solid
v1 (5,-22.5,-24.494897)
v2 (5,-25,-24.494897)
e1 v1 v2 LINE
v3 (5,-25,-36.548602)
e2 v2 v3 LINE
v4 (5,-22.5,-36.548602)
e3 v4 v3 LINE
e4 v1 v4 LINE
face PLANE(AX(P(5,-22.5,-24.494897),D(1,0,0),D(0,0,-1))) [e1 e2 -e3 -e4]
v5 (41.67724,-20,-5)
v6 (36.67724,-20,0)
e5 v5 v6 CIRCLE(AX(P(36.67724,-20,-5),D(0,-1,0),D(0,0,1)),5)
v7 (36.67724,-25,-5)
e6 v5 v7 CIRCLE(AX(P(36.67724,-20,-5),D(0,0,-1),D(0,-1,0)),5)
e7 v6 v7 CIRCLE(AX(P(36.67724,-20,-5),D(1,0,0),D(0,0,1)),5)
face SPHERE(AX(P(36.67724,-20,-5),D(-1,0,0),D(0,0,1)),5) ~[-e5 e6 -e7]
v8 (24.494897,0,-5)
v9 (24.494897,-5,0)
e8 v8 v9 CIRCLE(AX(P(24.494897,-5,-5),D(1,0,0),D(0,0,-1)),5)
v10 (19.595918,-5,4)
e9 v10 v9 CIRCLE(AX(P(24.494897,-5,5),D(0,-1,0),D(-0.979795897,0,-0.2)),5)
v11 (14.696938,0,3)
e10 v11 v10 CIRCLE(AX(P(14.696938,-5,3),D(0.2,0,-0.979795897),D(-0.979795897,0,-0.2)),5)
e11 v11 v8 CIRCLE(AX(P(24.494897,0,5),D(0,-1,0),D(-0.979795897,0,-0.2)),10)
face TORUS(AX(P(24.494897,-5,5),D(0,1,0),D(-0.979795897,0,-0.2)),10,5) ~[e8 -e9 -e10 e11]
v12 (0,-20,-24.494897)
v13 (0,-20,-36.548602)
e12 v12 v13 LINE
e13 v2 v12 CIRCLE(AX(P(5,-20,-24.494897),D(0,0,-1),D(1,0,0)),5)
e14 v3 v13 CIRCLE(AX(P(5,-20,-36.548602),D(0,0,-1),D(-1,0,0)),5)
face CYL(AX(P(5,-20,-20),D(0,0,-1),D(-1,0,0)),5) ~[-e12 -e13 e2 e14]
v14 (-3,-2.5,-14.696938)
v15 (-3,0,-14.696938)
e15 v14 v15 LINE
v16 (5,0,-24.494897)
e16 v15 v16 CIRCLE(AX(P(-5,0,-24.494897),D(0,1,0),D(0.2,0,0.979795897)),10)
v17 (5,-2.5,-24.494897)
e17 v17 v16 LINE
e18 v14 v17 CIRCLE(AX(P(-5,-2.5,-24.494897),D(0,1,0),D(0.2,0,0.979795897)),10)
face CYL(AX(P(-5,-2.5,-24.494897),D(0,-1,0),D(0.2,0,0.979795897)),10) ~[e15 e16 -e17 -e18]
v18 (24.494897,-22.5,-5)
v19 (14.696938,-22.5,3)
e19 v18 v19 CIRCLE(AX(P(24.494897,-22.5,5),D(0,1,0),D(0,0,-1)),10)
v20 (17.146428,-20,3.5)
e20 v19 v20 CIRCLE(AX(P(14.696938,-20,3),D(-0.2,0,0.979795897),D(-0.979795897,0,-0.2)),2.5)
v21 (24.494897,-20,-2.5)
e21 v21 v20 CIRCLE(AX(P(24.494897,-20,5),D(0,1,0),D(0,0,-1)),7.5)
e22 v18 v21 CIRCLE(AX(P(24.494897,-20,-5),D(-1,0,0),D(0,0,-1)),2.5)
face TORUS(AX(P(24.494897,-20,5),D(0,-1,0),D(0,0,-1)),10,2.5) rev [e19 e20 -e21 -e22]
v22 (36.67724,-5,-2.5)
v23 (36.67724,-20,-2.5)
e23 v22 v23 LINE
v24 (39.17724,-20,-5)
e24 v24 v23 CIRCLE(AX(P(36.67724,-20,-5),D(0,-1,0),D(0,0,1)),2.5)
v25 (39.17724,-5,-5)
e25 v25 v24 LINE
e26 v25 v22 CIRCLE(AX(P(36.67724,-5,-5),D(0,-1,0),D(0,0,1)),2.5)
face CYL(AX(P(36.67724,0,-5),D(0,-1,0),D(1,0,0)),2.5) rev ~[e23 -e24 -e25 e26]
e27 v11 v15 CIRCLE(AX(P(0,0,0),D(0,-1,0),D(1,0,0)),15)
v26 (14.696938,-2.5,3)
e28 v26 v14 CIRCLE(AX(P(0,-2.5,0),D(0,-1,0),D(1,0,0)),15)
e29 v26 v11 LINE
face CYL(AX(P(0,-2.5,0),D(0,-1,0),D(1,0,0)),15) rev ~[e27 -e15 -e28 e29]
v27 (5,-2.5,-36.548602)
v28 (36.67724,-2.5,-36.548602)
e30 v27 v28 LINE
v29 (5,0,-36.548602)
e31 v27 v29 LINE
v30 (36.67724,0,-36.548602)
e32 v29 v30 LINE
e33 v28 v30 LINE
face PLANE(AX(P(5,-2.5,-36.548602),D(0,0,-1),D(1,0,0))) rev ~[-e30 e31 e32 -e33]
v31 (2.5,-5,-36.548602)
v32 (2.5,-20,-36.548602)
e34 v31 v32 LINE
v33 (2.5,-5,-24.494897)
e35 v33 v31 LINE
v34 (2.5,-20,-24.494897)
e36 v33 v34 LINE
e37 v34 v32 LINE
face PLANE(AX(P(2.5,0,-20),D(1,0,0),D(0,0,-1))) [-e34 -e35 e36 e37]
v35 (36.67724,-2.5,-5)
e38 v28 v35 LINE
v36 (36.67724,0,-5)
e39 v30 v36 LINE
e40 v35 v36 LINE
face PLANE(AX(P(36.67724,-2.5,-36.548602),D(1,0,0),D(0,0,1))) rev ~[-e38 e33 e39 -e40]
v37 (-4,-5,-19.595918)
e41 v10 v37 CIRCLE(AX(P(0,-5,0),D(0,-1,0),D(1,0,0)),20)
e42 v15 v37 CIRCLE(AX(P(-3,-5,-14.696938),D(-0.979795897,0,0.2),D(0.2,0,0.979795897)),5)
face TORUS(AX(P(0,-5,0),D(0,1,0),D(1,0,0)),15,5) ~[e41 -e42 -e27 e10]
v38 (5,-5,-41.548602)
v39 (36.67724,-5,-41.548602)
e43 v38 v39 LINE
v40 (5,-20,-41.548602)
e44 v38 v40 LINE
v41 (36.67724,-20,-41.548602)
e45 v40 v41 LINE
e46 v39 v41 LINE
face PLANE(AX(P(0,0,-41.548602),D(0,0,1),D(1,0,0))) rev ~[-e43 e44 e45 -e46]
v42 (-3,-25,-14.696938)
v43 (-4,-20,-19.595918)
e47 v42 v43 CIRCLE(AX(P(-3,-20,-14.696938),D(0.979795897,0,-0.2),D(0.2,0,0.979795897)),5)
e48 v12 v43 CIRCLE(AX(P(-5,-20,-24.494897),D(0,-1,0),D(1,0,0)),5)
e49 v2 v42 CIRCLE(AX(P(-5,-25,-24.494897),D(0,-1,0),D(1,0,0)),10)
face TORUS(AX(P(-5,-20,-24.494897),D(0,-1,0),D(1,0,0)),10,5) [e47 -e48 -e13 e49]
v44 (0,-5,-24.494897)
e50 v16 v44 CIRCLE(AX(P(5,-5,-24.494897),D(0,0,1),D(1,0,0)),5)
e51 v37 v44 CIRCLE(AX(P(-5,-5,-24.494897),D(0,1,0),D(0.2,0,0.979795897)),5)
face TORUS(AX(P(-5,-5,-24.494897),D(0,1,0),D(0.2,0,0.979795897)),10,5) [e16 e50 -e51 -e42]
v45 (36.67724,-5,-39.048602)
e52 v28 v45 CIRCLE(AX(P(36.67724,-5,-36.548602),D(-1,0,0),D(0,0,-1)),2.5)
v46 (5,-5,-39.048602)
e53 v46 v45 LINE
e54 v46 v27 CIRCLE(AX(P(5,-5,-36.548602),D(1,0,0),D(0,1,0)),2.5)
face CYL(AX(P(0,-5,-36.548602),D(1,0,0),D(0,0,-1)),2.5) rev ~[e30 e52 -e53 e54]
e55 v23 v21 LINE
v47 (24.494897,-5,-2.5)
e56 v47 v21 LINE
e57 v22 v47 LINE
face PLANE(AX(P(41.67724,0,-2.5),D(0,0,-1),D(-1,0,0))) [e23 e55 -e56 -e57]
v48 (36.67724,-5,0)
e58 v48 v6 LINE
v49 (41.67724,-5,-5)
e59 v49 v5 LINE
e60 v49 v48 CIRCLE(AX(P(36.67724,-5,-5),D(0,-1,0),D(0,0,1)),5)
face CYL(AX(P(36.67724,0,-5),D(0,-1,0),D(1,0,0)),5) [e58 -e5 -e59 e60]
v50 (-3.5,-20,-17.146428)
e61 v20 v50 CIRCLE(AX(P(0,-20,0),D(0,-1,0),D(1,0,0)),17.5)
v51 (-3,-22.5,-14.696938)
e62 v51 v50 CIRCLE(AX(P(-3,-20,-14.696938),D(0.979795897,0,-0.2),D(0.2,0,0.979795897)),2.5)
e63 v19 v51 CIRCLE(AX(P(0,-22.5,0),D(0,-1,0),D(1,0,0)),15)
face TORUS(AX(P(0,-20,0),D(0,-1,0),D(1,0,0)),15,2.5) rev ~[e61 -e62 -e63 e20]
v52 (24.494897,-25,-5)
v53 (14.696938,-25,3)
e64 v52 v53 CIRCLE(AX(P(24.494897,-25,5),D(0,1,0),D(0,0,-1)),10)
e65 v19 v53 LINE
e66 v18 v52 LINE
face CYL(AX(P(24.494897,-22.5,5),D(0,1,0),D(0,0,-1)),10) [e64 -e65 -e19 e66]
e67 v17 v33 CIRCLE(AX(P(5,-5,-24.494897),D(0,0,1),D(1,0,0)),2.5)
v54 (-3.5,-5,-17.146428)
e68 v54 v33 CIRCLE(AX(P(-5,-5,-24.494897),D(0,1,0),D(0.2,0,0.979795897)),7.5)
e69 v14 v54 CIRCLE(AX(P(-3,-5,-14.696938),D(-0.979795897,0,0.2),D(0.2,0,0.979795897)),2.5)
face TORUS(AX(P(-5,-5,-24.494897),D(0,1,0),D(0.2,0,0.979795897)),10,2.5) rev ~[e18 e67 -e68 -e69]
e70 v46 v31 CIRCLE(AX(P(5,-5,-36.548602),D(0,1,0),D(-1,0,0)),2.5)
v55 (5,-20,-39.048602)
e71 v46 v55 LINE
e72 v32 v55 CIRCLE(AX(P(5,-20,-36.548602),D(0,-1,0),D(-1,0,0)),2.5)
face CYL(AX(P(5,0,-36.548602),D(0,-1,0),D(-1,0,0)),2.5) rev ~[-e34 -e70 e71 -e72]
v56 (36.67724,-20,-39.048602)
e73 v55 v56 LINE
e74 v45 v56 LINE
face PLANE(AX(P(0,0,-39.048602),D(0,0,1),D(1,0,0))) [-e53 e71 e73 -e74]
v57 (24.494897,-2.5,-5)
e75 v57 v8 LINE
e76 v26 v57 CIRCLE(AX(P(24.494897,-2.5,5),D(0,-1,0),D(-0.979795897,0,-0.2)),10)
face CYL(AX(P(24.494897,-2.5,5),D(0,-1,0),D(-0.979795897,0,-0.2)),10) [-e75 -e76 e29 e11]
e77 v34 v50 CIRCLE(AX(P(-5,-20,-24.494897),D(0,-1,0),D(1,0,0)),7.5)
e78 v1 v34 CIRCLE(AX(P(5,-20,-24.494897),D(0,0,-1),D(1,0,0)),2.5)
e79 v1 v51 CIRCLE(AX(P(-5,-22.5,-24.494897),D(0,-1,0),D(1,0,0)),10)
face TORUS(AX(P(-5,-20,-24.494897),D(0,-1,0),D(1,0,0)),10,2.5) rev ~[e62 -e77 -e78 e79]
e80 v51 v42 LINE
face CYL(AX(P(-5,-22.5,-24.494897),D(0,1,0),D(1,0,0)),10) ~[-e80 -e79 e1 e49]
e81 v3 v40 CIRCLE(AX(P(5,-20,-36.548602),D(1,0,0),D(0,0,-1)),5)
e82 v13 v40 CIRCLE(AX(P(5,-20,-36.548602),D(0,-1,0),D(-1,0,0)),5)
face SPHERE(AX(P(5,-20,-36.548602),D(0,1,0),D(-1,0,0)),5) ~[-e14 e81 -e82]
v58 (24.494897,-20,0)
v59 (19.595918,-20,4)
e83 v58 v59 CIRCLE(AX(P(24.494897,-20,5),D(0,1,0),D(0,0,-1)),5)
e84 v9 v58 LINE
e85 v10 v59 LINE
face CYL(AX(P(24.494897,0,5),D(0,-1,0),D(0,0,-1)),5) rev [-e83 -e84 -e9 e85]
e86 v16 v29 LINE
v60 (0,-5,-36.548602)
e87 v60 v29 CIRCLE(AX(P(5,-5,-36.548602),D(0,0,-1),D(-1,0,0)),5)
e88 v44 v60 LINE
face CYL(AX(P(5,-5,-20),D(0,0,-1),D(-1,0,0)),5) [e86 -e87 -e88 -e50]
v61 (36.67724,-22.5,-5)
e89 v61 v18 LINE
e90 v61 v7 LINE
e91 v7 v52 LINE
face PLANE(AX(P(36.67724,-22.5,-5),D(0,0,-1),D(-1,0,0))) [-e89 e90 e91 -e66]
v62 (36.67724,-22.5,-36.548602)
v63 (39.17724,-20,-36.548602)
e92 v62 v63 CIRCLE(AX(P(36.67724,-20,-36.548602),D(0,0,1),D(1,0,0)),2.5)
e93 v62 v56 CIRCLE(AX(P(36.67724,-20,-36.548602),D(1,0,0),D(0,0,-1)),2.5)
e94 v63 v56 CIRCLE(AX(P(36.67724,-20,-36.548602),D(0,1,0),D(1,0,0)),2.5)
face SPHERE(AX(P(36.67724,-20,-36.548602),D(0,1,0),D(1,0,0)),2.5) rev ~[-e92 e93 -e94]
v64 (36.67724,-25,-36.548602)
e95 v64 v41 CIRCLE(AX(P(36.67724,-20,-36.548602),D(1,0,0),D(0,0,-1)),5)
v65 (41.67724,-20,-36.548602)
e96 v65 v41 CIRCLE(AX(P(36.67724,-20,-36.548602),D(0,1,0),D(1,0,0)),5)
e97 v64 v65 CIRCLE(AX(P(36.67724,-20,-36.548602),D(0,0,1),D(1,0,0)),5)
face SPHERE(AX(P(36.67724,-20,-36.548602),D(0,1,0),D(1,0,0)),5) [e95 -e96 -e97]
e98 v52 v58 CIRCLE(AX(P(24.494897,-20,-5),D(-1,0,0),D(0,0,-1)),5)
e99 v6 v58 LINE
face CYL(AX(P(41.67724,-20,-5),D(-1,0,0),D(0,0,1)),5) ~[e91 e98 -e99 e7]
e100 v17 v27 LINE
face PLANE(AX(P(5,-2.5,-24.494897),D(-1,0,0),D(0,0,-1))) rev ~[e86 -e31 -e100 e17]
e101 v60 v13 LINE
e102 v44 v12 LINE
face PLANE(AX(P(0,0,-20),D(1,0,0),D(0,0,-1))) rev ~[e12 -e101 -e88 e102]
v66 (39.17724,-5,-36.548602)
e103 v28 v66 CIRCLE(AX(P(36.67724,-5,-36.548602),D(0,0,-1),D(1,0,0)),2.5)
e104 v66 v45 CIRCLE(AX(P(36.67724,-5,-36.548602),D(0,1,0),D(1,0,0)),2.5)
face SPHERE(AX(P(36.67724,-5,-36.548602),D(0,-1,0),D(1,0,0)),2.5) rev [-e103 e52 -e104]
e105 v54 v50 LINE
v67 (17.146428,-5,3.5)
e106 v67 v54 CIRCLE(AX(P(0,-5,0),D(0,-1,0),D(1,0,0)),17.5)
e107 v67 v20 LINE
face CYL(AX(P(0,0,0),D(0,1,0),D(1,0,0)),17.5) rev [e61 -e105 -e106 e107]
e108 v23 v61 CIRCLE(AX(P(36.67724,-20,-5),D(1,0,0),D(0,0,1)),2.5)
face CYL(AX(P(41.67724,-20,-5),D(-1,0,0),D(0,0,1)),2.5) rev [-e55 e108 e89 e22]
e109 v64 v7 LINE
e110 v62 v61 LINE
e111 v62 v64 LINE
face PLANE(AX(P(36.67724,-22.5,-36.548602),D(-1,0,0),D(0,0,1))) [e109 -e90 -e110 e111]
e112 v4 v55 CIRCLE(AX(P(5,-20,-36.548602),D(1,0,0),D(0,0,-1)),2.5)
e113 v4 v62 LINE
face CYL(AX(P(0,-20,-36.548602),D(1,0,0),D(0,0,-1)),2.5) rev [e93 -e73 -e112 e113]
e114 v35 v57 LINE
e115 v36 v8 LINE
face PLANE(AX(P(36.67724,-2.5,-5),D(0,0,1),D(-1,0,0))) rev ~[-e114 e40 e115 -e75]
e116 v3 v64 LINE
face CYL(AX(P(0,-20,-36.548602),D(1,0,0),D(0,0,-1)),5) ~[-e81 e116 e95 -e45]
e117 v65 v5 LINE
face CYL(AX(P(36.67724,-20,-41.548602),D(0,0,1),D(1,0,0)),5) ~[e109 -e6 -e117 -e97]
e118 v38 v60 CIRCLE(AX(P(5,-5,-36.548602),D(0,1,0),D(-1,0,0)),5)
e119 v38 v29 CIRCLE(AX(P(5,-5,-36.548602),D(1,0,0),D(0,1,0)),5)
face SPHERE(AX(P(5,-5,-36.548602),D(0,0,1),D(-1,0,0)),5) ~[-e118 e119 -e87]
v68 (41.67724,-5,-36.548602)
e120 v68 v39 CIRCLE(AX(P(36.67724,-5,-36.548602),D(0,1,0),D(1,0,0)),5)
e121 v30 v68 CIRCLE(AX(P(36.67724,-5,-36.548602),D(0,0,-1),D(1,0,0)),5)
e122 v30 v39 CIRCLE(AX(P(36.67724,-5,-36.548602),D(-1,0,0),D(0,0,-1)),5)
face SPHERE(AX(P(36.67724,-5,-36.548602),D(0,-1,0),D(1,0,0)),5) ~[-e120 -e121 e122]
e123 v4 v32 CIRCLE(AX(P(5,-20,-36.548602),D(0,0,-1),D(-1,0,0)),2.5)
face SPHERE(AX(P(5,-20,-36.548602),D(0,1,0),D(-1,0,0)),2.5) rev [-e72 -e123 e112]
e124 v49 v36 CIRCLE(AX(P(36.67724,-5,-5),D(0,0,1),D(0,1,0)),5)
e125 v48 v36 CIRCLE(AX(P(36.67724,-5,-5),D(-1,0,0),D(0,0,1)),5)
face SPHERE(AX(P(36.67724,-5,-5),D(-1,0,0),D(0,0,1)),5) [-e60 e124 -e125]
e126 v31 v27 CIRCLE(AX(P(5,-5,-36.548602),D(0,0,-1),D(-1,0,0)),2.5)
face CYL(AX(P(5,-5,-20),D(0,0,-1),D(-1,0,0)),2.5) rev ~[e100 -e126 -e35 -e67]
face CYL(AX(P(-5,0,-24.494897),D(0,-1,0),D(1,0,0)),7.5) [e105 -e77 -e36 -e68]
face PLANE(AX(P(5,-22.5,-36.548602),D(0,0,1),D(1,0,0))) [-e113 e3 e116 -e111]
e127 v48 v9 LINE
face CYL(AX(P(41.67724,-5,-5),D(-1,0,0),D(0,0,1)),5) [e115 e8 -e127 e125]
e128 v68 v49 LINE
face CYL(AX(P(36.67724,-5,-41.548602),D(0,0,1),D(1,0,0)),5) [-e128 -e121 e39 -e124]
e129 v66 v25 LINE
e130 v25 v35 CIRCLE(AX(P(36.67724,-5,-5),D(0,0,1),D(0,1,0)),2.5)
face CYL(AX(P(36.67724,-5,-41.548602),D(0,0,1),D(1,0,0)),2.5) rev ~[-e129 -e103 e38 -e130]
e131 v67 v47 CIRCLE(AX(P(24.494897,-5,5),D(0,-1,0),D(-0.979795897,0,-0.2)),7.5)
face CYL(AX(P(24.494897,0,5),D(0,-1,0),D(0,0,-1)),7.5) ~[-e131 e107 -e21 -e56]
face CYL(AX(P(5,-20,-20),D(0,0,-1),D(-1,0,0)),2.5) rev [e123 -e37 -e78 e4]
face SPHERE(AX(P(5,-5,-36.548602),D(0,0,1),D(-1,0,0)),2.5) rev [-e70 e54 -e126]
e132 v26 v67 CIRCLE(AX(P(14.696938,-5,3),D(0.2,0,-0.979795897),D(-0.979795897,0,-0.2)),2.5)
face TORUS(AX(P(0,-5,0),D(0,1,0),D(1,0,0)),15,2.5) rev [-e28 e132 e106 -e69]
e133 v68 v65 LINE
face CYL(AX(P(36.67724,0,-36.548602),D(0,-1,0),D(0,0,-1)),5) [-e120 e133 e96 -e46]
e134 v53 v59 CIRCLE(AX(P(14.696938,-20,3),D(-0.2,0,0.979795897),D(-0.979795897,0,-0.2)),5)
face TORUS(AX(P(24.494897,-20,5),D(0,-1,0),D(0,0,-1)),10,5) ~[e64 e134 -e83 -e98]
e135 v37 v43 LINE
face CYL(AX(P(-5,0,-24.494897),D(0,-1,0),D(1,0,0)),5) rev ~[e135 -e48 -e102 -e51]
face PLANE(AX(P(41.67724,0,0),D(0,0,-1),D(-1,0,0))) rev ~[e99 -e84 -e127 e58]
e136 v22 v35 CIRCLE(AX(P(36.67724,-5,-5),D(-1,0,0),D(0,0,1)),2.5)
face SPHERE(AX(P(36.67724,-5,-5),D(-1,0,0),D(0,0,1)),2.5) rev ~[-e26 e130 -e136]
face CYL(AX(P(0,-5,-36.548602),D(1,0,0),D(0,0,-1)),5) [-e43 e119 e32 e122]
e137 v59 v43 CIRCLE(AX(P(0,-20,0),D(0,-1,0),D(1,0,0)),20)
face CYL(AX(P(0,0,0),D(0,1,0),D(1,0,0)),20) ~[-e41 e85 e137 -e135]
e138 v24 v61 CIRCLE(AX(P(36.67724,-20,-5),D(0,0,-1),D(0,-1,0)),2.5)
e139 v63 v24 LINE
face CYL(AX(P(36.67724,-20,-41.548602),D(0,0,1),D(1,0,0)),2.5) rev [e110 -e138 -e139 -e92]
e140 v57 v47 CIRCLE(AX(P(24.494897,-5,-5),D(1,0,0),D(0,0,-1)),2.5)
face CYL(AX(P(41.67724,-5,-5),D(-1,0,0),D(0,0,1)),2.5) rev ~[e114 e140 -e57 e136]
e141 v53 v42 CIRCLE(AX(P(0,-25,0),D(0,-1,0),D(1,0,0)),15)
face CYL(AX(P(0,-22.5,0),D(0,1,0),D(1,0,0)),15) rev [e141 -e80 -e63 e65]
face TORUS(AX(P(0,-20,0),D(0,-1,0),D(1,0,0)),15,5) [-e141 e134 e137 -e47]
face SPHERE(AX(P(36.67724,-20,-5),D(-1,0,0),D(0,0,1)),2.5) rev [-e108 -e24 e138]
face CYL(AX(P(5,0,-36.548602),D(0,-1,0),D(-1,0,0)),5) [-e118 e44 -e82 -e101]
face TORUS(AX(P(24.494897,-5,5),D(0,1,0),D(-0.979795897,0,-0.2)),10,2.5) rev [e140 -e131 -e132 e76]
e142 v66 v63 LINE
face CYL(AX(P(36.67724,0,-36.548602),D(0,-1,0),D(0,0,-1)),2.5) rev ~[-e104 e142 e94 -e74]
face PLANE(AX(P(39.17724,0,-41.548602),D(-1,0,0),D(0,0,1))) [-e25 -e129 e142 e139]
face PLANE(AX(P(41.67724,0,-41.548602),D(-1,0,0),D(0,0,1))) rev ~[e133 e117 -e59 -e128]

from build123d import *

# Parameters (mm, degrees)
F1_DEPTH = 25
F2_R     = 5
F3_T     = -2.5


# Not quite as in the source:
# - a shell that OpenCascade refuses in one call is made with other operations: the cavity is built on its own and cut out


with BuildPart() as f1:
    # F0 (on Front) → F1 (new body)
    with BuildSketch(Plane.XZ):
        with BuildLine():
            ThreePointArc((0, -20), (14.1421356237, -14.1421356237), (20, 0))
            Line((20, 0), (0, 0))
            Line((0, 0), (0, -20))
        make_face()
        with BuildLine():
            Line((41.6772402823, 0), (20, 0))
            ThreePointArc((20, 0), (14.1421356237, -14.1421356237), (0, -20))
            Line((0, -20), (0, -41.548602283))
            Line((0, -41.548602283), (41.6772402823, -41.548602283))
            Line((41.6772402823, -41.548602283), (41.6772402823, 0))
        make_face()
        with BuildLine():
            Line((0, 0), (20, 0))
            ThreePointArc((20, 0), (-14.1421356237, 14.1421356237), (0, -20))
            Line((0, -20), (0, 0))
        make_face()
    extrude(amount=F1_DEPTH)

    # F2
    f2_edges = [f1.edges().sort_by_distance(p)[0] for p in [
        (30.83862, -25, 0),
        (30.83862, 0, 0),
        (41.67724, -12.5, 0),
        (41.67724, -12.5, -41.548602),
        (41.67724, 0, -20.774301),
        (41.67724, -25, -20.774301),
        (0, 0, -30.774301),
        (0, -12.5, -41.548602),
        (20.83862, 0, -41.548602),
        (0, -25, -30.774301),
        (20.83862, -25, -41.548602),
        (-14.142136, -25, 14.142136),
        (20, -12.5, 0),
        (0, -12.5, -20),
        (-14.142136, 0, 14.142136),
    ]]
    fillet(f2_edges, radius=F2_R)

    # F3: a shell. OpenCascade refuses it in one call, so the cavity is built on its own and cut out:
    # the body offset inwards by the wall thickness, plus a prism from it out through each open face.
    f3_core = offset(f1.part, amount=F3_T, mode=Mode.PRIVATE)
    f3_exits = [f3_core.faces().sort_by_distance(p)[0] for p in [
        (12.277465, -22.5, -12.239423),
        (12.277465, -2.5, -12.239423),
    ]]
    add(f3_core, mode=Mode.SUBTRACT)
    extrude(f3_exits, amount=-F3_T, mode=Mode.SUBTRACT)


solid = f1.part
